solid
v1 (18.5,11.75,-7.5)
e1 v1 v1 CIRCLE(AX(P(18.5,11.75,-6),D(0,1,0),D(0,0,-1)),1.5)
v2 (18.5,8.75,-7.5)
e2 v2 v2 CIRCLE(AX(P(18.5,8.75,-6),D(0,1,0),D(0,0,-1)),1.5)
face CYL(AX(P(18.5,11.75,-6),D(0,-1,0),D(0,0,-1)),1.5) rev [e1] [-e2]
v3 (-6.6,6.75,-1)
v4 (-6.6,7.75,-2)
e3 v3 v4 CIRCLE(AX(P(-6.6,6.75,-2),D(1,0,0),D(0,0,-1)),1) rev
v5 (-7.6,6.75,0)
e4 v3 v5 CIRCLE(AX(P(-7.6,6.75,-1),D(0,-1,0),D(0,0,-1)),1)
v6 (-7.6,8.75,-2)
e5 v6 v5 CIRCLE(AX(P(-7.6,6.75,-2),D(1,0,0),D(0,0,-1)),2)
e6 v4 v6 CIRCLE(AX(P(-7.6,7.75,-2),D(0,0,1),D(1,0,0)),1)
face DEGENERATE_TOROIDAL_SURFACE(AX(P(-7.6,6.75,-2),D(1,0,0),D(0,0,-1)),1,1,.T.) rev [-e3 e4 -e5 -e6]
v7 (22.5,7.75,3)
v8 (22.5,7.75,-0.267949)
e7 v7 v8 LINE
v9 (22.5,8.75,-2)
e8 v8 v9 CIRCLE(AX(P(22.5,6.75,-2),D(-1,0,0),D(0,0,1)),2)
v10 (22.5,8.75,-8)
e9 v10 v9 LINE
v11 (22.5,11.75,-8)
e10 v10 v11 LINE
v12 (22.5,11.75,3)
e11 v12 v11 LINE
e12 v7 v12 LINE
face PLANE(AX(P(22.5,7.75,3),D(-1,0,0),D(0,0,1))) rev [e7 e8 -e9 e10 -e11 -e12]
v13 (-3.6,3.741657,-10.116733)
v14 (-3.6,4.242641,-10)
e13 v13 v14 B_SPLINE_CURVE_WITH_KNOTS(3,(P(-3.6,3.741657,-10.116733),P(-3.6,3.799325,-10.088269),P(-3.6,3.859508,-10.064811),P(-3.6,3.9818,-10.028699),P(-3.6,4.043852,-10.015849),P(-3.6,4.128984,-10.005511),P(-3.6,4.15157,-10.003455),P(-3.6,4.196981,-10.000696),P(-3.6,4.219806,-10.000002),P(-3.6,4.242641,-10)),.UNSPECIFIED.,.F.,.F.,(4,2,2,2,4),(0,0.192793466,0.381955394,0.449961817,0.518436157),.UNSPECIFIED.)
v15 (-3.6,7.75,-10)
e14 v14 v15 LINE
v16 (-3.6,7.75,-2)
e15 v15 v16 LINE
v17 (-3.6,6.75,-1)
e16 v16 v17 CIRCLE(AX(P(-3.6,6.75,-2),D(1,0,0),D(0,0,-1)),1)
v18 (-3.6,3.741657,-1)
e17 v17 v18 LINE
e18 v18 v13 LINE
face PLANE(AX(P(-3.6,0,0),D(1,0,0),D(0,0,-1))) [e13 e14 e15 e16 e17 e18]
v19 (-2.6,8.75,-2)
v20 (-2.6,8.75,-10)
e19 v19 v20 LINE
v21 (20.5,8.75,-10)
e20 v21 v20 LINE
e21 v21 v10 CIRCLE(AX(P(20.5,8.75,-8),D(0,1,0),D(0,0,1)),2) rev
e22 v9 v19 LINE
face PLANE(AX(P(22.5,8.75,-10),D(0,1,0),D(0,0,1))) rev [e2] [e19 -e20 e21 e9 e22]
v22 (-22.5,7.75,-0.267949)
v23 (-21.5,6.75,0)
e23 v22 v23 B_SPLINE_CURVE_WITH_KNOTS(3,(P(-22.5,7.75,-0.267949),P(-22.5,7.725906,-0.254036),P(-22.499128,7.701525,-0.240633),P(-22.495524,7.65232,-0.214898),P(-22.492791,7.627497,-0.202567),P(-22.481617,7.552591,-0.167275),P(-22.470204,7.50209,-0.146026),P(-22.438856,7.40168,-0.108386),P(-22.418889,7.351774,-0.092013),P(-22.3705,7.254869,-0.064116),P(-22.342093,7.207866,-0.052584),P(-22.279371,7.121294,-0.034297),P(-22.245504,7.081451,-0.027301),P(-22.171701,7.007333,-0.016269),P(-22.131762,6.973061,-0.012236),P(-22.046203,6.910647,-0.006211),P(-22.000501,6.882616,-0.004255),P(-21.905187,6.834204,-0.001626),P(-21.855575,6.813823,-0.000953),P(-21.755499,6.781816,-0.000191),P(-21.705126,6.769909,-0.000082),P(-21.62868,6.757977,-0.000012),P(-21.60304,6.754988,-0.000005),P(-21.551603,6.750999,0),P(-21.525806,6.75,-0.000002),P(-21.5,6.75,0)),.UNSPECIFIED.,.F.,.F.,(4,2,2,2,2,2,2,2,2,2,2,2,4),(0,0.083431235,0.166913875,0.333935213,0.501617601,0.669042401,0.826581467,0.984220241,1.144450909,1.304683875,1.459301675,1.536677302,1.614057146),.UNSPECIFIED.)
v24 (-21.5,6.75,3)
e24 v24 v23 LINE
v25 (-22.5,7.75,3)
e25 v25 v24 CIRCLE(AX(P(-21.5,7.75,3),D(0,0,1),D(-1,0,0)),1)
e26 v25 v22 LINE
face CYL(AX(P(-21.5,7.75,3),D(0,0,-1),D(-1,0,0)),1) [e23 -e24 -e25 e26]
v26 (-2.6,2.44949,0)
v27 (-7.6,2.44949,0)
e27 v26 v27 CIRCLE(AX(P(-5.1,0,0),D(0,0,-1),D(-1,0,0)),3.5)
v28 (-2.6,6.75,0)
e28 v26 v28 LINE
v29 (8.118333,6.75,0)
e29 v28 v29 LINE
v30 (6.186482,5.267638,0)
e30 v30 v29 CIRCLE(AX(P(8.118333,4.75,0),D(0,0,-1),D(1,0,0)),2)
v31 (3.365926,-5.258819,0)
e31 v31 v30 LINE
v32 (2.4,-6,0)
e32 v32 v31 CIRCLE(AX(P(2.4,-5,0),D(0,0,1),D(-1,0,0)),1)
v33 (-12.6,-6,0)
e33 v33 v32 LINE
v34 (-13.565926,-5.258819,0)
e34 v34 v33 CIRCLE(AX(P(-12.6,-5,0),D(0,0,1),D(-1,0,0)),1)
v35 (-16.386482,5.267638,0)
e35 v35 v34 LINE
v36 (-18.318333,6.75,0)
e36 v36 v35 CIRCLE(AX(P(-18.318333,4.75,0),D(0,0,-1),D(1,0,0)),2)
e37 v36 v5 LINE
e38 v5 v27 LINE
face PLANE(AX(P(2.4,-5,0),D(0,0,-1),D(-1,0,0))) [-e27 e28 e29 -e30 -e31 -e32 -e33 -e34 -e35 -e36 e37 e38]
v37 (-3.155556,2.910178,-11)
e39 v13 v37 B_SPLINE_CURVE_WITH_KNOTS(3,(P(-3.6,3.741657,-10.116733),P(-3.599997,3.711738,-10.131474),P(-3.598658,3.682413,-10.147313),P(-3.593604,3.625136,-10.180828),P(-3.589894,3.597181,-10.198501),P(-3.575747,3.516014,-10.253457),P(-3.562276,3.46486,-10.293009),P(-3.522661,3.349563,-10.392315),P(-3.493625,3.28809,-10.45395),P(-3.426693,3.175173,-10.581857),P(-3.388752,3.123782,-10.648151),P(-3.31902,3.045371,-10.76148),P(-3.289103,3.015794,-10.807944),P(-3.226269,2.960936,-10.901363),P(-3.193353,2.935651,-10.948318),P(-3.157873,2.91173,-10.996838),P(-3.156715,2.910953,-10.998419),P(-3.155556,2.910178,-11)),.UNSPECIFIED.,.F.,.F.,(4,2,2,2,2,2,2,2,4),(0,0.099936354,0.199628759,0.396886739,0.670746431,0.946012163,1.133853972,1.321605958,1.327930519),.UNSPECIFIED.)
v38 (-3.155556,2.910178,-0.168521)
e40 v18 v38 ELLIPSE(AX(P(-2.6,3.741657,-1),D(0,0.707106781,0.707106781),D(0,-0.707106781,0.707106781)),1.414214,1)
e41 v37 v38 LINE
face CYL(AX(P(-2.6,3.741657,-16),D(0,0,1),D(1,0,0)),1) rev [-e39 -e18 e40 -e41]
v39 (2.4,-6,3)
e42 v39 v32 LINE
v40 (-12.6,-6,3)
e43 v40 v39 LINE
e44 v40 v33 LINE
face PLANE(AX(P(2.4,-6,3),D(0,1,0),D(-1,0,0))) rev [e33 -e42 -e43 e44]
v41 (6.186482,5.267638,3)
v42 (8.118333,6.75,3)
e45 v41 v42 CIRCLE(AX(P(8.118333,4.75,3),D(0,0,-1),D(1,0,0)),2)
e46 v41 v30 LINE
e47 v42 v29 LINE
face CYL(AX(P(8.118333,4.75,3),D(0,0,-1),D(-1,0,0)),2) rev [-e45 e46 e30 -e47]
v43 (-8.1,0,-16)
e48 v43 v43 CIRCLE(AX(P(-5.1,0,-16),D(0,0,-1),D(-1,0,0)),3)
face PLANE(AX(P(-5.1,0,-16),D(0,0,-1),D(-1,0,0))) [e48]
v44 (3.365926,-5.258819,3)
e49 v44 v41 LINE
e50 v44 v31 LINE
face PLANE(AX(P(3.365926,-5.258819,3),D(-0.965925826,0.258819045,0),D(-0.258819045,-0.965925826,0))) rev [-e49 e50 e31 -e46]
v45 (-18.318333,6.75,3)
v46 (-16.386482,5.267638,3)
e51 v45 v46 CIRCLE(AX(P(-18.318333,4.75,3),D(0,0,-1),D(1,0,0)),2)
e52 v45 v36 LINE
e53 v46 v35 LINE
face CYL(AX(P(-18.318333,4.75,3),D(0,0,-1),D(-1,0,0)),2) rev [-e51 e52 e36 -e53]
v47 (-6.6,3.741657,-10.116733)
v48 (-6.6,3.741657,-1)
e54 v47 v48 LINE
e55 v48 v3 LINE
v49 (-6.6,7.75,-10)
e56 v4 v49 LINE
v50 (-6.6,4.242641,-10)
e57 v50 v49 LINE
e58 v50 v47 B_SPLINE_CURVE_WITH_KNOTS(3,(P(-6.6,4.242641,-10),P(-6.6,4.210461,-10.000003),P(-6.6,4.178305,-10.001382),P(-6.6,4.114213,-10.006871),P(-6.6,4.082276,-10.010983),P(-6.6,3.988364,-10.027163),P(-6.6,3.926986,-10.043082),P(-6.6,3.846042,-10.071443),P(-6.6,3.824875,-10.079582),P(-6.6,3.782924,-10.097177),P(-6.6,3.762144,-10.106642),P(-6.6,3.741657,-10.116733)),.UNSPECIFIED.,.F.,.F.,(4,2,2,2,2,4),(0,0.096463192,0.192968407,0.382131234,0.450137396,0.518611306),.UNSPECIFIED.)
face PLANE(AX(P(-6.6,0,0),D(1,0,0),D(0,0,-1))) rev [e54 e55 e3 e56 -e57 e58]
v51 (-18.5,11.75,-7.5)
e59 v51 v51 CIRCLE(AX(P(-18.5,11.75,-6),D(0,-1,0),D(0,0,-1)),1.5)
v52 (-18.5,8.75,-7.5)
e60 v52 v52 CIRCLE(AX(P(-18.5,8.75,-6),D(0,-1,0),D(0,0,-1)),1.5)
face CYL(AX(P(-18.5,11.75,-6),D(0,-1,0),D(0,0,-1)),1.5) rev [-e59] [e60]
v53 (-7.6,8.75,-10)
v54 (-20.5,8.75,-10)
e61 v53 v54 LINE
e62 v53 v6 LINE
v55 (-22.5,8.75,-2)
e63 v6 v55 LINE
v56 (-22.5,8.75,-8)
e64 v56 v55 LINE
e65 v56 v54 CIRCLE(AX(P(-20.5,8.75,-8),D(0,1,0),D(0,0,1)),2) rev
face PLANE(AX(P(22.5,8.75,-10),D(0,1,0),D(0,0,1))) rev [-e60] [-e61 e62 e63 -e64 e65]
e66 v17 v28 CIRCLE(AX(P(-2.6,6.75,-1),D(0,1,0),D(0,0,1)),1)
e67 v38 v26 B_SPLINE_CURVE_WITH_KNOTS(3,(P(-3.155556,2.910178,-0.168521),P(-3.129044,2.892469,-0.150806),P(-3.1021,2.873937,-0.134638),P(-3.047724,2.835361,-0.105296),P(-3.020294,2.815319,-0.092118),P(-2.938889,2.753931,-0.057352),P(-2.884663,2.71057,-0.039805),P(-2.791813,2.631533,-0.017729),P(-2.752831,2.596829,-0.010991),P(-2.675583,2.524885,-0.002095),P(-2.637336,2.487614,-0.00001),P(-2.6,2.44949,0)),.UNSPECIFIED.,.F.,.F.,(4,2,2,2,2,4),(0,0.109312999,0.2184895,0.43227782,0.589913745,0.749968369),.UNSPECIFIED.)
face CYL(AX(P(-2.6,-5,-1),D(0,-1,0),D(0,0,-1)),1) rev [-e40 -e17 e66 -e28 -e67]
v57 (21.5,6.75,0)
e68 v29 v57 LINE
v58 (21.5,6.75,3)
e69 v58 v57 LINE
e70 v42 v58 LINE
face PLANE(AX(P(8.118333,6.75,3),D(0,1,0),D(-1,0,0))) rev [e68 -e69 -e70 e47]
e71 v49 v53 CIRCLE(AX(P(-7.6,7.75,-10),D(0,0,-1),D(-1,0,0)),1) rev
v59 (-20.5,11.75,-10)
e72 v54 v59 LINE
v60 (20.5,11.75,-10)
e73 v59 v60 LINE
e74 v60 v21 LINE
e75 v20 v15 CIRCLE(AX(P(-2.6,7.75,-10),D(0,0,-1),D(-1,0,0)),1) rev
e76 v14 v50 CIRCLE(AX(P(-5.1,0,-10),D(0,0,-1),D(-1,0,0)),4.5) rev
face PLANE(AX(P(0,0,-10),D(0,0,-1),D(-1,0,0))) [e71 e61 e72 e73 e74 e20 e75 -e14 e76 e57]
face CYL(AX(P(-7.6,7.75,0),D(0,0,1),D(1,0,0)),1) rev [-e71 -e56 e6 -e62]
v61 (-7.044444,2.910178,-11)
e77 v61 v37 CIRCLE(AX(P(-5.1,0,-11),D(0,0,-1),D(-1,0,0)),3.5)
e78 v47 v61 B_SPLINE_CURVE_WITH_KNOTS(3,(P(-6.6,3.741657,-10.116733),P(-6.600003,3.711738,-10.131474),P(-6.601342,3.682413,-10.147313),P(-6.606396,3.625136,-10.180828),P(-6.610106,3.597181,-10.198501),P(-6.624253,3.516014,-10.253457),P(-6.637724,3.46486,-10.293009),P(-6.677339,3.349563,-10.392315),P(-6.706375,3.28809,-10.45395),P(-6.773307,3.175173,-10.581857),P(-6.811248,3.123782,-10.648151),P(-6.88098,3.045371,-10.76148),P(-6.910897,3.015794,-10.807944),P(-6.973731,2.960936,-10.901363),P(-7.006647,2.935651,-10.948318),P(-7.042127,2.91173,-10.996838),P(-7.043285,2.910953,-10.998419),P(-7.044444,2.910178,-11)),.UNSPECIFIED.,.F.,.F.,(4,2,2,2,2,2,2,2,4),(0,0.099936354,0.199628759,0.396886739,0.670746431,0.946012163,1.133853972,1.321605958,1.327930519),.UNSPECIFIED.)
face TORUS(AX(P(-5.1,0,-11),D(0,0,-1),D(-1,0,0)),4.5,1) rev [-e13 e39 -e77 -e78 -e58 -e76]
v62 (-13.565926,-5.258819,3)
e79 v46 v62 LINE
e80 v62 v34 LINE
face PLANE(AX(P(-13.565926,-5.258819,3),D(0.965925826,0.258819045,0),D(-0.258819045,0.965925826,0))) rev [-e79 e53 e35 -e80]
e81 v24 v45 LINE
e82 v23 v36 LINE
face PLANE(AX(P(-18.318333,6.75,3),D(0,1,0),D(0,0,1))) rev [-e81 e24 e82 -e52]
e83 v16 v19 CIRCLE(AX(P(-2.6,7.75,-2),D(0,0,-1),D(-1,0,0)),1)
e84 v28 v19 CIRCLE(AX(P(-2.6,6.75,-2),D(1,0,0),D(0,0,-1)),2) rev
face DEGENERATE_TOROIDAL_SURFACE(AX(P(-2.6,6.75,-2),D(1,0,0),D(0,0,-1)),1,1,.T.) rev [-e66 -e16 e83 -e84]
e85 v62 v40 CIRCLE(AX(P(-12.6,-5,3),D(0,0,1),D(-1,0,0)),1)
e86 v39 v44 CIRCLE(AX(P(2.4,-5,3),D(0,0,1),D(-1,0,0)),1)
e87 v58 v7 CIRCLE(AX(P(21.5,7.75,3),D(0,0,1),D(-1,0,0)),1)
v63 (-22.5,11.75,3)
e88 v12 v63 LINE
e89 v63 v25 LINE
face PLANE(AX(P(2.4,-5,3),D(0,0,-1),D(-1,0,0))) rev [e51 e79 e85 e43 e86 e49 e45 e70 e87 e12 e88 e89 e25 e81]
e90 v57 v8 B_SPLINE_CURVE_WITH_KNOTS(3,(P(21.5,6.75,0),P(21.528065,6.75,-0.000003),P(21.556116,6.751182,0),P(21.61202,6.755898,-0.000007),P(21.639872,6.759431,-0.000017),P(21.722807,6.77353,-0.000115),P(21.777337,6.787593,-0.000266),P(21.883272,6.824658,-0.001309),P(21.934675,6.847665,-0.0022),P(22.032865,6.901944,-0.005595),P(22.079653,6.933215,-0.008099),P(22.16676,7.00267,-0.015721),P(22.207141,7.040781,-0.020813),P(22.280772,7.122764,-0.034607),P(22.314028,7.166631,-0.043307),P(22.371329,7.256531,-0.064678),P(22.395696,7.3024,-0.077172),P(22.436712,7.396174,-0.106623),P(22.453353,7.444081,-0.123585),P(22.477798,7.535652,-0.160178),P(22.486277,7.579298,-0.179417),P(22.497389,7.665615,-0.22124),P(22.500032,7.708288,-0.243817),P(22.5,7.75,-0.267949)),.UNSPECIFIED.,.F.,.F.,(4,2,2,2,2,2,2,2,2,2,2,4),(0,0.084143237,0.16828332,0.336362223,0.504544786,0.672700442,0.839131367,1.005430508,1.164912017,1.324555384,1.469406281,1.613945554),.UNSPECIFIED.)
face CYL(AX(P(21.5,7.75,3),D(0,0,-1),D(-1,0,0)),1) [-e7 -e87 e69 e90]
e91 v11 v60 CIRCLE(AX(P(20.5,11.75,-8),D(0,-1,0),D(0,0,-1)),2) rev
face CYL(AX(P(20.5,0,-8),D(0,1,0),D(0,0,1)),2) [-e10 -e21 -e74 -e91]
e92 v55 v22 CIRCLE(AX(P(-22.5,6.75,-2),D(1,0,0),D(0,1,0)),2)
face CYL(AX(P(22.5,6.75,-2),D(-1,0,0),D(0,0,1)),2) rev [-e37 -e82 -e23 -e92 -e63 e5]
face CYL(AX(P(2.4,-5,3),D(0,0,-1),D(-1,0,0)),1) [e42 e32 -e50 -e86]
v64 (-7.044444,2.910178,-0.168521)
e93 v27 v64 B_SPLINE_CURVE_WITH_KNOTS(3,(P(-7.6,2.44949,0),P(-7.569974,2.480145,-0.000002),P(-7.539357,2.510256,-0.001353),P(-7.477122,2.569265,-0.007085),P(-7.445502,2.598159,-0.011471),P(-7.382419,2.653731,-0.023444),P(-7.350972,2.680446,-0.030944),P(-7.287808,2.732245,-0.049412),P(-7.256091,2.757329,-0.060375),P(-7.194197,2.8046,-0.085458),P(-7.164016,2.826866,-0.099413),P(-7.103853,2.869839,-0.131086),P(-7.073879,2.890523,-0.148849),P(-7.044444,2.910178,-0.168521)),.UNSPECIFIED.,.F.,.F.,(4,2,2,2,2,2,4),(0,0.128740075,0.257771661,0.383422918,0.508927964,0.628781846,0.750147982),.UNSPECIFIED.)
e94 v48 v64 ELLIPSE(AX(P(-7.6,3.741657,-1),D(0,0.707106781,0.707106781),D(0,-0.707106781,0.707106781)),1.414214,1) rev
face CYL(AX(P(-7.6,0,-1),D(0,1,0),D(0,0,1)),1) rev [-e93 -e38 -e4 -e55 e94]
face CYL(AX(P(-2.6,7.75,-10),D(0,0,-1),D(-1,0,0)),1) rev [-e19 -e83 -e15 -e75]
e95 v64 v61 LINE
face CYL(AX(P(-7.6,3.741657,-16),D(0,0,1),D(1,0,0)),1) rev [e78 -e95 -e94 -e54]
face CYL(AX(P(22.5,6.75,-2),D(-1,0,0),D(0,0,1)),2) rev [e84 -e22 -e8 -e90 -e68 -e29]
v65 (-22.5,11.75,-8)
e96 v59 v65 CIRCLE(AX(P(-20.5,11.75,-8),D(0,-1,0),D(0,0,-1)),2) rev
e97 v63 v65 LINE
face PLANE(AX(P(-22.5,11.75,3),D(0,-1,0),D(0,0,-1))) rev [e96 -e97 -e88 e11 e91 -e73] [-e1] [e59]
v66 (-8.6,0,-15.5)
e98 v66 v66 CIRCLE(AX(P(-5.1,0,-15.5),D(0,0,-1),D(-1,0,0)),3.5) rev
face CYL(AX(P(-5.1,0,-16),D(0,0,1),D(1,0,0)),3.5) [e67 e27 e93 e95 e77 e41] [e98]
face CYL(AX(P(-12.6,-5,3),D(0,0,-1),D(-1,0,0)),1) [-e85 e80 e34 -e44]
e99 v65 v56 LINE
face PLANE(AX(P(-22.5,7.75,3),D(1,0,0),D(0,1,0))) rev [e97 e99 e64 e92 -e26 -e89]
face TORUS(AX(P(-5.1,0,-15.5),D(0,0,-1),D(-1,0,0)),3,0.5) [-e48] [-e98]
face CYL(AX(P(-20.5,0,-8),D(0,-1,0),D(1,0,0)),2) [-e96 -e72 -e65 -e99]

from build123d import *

# Parameters (mm, degrees)
BOSS_EXTRUDE1_DEPTH = 3
SKETCH4_W           = 45
SKETCH4_H           = 3
BOSS_EXTRUDE2_DEPTH = 10
FILLET1_R           = 2
FILLET2_R           = 2
SKETCH5_R           = 1.5
CUT_EXTRUDE1_DEPTH  = 29.702134145
SKETCH6_R           = 3.5
BOSS_EXTRUDE3_DEPTH = 16
FILLET3_R           = 0.5
SKETCH7_W           = 10
SKETCH7_H           = 8.75
BOSS_EXTRUDE4_DEPTH = 1.5
FILLET4_R           = 1


with BuildPart() as part:
    # Sketch3 → Boss-Extrude1 (new body)
    with BuildSketch(Plane.XY):
        with BuildLine():
            Line((2.4, -6), (-12.6, -6))
            ThreePointArc((-12.6, -6), (-13.208761429, -5.79335334), (-13.565925826, -5.258819045))
            Line((-13.565925826, -5.258819045), (-16.386481515, 5.26763809))
            ThreePointArc((-16.386481515, 5.26763809), (-17.100810309, 6.336706681), (-18.318333167, 6.75))
            Line((-18.318333167, 6.75), (-21.5, 6.75))
            ThreePointArc((-21.5, 6.75), (-22.207106781, 7.042893219), (-22.5, 7.75))
            Line((-22.5, 7.75), (-22.5, 11.75))
            Line((-22.5, 11.75), (22.5, 11.75))
            Line((22.5, 11.75), (22.5, 7.75))
            ThreePointArc((22.5, 7.75), (22.207106781, 7.042893219), (21.5, 6.75))
            Line((21.5, 6.75), (8.118333167, 6.75))
            ThreePointArc((8.118333167, 6.75), (6.900810309, 6.336706681), (6.186481515, 5.26763809))
            Line((6.186481515, 5.26763809), (3.365925826, -5.258819045))
            ThreePointArc((3.365925826, -5.258819045), (3.008761429, -5.79335334), (2.4, -6))
        make_face()
    extrude(amount=BOSS_EXTRUDE1_DEPTH)

    # Sketch4 → Boss-Extrude2 (add)
    with BuildSketch(Plane(origin=(0, 0, 0), x_dir=(-1, 0, 0), z_dir=(0, 0, -1))):
        with Locations((0, 10.25)):
            Rectangle(SKETCH4_W, SKETCH4_H)
    extrude(amount=BOSS_EXTRUDE2_DEPTH)

    # Fillet1
    fillet1_edges = [part.edges().sort_by_distance(p)[0] for p in [
        (0, 8.75, 0),
    ]]
    fillet(fillet1_edges, radius=FILLET1_R - 0.0001)  # a hair under: the kernel refuses the full size

    # Fillet2
    fillet2_edges = [part.edges().sort_by_distance(p)[0] for p in [
        (22.5, 10.25, -10),
        (-22.5, 10.25, -10),
    ]]
    fillet(fillet2_edges, radius=FILLET2_R)

    # Sketch5 → Cut-Extrude1 (cut, through all)
    with BuildSketch(Plane.XZ.offset(-8.75)):
        with Locations(Location((-18.5, -6, 0), (0, 0, 270))):
            Circle(SKETCH5_R)
    cut_extrude1 = extrude(amount=-CUT_EXTRUDE1_DEPTH, mode=Mode.SUBTRACT)

    # Mirror1: Cut-Extrude1 across plane
    add(cut_extrude1.mirror(Plane(origin=(0, 0, 0), x_dir=(0, 0, 1), z_dir=(1, 0, 0))), mode=Mode.SUBTRACT)

    # Sketch6 → Boss-Extrude3 (add)
    with BuildSketch(Plane(origin=(0, 0, 0), x_dir=(-1, 0, 0), z_dir=(0, 0, -1))):
        with Locations((5.1, 0)):
            Circle(SKETCH6_R)
    extrude(amount=BOSS_EXTRUDE3_DEPTH)

    # Fillet3
    fillet3_edges = [part.edges().sort_by_distance(p)[0] for p in [
        (-1.6, 0, -16),
    ]]
    fillet(fillet3_edges, radius=FILLET3_R)

    # Sketch7 → Boss-Extrude4 (add, symmetric)
    with BuildSketch(Plane(origin=(-5.1, 0, 0), x_dir=(0, 0, -1), z_dir=(1, 0, 0))):
        with Locations((5, 4.375)):
            Rectangle(SKETCH7_W, SKETCH7_H)
    extrude(amount=BOSS_EXTRUDE4_DEPTH, both=True)

    # Fillet4
    fillet4_edges = [part.edges().sort_by_distance(p)[0] for p in [
        (-3.6, 8.164242852, -0.585757148),
        (-6.6, 4.95618883, 0),
        (-6.6, 8.164242852, -0.585757148),
        (-6.6, 8.75, -5.99995),
        (-3.6, 8.75, -5.99995),
        (-3.6, 4.95618883, 0),
        (-6.6, 3.16227766, -5),
        (-5.1, 3.5, -10),
        (-3.6, 3.16227766, -5),
    ]]
    fillet(fillet4_edges, radius=FILLET4_R)


solid = part.part
